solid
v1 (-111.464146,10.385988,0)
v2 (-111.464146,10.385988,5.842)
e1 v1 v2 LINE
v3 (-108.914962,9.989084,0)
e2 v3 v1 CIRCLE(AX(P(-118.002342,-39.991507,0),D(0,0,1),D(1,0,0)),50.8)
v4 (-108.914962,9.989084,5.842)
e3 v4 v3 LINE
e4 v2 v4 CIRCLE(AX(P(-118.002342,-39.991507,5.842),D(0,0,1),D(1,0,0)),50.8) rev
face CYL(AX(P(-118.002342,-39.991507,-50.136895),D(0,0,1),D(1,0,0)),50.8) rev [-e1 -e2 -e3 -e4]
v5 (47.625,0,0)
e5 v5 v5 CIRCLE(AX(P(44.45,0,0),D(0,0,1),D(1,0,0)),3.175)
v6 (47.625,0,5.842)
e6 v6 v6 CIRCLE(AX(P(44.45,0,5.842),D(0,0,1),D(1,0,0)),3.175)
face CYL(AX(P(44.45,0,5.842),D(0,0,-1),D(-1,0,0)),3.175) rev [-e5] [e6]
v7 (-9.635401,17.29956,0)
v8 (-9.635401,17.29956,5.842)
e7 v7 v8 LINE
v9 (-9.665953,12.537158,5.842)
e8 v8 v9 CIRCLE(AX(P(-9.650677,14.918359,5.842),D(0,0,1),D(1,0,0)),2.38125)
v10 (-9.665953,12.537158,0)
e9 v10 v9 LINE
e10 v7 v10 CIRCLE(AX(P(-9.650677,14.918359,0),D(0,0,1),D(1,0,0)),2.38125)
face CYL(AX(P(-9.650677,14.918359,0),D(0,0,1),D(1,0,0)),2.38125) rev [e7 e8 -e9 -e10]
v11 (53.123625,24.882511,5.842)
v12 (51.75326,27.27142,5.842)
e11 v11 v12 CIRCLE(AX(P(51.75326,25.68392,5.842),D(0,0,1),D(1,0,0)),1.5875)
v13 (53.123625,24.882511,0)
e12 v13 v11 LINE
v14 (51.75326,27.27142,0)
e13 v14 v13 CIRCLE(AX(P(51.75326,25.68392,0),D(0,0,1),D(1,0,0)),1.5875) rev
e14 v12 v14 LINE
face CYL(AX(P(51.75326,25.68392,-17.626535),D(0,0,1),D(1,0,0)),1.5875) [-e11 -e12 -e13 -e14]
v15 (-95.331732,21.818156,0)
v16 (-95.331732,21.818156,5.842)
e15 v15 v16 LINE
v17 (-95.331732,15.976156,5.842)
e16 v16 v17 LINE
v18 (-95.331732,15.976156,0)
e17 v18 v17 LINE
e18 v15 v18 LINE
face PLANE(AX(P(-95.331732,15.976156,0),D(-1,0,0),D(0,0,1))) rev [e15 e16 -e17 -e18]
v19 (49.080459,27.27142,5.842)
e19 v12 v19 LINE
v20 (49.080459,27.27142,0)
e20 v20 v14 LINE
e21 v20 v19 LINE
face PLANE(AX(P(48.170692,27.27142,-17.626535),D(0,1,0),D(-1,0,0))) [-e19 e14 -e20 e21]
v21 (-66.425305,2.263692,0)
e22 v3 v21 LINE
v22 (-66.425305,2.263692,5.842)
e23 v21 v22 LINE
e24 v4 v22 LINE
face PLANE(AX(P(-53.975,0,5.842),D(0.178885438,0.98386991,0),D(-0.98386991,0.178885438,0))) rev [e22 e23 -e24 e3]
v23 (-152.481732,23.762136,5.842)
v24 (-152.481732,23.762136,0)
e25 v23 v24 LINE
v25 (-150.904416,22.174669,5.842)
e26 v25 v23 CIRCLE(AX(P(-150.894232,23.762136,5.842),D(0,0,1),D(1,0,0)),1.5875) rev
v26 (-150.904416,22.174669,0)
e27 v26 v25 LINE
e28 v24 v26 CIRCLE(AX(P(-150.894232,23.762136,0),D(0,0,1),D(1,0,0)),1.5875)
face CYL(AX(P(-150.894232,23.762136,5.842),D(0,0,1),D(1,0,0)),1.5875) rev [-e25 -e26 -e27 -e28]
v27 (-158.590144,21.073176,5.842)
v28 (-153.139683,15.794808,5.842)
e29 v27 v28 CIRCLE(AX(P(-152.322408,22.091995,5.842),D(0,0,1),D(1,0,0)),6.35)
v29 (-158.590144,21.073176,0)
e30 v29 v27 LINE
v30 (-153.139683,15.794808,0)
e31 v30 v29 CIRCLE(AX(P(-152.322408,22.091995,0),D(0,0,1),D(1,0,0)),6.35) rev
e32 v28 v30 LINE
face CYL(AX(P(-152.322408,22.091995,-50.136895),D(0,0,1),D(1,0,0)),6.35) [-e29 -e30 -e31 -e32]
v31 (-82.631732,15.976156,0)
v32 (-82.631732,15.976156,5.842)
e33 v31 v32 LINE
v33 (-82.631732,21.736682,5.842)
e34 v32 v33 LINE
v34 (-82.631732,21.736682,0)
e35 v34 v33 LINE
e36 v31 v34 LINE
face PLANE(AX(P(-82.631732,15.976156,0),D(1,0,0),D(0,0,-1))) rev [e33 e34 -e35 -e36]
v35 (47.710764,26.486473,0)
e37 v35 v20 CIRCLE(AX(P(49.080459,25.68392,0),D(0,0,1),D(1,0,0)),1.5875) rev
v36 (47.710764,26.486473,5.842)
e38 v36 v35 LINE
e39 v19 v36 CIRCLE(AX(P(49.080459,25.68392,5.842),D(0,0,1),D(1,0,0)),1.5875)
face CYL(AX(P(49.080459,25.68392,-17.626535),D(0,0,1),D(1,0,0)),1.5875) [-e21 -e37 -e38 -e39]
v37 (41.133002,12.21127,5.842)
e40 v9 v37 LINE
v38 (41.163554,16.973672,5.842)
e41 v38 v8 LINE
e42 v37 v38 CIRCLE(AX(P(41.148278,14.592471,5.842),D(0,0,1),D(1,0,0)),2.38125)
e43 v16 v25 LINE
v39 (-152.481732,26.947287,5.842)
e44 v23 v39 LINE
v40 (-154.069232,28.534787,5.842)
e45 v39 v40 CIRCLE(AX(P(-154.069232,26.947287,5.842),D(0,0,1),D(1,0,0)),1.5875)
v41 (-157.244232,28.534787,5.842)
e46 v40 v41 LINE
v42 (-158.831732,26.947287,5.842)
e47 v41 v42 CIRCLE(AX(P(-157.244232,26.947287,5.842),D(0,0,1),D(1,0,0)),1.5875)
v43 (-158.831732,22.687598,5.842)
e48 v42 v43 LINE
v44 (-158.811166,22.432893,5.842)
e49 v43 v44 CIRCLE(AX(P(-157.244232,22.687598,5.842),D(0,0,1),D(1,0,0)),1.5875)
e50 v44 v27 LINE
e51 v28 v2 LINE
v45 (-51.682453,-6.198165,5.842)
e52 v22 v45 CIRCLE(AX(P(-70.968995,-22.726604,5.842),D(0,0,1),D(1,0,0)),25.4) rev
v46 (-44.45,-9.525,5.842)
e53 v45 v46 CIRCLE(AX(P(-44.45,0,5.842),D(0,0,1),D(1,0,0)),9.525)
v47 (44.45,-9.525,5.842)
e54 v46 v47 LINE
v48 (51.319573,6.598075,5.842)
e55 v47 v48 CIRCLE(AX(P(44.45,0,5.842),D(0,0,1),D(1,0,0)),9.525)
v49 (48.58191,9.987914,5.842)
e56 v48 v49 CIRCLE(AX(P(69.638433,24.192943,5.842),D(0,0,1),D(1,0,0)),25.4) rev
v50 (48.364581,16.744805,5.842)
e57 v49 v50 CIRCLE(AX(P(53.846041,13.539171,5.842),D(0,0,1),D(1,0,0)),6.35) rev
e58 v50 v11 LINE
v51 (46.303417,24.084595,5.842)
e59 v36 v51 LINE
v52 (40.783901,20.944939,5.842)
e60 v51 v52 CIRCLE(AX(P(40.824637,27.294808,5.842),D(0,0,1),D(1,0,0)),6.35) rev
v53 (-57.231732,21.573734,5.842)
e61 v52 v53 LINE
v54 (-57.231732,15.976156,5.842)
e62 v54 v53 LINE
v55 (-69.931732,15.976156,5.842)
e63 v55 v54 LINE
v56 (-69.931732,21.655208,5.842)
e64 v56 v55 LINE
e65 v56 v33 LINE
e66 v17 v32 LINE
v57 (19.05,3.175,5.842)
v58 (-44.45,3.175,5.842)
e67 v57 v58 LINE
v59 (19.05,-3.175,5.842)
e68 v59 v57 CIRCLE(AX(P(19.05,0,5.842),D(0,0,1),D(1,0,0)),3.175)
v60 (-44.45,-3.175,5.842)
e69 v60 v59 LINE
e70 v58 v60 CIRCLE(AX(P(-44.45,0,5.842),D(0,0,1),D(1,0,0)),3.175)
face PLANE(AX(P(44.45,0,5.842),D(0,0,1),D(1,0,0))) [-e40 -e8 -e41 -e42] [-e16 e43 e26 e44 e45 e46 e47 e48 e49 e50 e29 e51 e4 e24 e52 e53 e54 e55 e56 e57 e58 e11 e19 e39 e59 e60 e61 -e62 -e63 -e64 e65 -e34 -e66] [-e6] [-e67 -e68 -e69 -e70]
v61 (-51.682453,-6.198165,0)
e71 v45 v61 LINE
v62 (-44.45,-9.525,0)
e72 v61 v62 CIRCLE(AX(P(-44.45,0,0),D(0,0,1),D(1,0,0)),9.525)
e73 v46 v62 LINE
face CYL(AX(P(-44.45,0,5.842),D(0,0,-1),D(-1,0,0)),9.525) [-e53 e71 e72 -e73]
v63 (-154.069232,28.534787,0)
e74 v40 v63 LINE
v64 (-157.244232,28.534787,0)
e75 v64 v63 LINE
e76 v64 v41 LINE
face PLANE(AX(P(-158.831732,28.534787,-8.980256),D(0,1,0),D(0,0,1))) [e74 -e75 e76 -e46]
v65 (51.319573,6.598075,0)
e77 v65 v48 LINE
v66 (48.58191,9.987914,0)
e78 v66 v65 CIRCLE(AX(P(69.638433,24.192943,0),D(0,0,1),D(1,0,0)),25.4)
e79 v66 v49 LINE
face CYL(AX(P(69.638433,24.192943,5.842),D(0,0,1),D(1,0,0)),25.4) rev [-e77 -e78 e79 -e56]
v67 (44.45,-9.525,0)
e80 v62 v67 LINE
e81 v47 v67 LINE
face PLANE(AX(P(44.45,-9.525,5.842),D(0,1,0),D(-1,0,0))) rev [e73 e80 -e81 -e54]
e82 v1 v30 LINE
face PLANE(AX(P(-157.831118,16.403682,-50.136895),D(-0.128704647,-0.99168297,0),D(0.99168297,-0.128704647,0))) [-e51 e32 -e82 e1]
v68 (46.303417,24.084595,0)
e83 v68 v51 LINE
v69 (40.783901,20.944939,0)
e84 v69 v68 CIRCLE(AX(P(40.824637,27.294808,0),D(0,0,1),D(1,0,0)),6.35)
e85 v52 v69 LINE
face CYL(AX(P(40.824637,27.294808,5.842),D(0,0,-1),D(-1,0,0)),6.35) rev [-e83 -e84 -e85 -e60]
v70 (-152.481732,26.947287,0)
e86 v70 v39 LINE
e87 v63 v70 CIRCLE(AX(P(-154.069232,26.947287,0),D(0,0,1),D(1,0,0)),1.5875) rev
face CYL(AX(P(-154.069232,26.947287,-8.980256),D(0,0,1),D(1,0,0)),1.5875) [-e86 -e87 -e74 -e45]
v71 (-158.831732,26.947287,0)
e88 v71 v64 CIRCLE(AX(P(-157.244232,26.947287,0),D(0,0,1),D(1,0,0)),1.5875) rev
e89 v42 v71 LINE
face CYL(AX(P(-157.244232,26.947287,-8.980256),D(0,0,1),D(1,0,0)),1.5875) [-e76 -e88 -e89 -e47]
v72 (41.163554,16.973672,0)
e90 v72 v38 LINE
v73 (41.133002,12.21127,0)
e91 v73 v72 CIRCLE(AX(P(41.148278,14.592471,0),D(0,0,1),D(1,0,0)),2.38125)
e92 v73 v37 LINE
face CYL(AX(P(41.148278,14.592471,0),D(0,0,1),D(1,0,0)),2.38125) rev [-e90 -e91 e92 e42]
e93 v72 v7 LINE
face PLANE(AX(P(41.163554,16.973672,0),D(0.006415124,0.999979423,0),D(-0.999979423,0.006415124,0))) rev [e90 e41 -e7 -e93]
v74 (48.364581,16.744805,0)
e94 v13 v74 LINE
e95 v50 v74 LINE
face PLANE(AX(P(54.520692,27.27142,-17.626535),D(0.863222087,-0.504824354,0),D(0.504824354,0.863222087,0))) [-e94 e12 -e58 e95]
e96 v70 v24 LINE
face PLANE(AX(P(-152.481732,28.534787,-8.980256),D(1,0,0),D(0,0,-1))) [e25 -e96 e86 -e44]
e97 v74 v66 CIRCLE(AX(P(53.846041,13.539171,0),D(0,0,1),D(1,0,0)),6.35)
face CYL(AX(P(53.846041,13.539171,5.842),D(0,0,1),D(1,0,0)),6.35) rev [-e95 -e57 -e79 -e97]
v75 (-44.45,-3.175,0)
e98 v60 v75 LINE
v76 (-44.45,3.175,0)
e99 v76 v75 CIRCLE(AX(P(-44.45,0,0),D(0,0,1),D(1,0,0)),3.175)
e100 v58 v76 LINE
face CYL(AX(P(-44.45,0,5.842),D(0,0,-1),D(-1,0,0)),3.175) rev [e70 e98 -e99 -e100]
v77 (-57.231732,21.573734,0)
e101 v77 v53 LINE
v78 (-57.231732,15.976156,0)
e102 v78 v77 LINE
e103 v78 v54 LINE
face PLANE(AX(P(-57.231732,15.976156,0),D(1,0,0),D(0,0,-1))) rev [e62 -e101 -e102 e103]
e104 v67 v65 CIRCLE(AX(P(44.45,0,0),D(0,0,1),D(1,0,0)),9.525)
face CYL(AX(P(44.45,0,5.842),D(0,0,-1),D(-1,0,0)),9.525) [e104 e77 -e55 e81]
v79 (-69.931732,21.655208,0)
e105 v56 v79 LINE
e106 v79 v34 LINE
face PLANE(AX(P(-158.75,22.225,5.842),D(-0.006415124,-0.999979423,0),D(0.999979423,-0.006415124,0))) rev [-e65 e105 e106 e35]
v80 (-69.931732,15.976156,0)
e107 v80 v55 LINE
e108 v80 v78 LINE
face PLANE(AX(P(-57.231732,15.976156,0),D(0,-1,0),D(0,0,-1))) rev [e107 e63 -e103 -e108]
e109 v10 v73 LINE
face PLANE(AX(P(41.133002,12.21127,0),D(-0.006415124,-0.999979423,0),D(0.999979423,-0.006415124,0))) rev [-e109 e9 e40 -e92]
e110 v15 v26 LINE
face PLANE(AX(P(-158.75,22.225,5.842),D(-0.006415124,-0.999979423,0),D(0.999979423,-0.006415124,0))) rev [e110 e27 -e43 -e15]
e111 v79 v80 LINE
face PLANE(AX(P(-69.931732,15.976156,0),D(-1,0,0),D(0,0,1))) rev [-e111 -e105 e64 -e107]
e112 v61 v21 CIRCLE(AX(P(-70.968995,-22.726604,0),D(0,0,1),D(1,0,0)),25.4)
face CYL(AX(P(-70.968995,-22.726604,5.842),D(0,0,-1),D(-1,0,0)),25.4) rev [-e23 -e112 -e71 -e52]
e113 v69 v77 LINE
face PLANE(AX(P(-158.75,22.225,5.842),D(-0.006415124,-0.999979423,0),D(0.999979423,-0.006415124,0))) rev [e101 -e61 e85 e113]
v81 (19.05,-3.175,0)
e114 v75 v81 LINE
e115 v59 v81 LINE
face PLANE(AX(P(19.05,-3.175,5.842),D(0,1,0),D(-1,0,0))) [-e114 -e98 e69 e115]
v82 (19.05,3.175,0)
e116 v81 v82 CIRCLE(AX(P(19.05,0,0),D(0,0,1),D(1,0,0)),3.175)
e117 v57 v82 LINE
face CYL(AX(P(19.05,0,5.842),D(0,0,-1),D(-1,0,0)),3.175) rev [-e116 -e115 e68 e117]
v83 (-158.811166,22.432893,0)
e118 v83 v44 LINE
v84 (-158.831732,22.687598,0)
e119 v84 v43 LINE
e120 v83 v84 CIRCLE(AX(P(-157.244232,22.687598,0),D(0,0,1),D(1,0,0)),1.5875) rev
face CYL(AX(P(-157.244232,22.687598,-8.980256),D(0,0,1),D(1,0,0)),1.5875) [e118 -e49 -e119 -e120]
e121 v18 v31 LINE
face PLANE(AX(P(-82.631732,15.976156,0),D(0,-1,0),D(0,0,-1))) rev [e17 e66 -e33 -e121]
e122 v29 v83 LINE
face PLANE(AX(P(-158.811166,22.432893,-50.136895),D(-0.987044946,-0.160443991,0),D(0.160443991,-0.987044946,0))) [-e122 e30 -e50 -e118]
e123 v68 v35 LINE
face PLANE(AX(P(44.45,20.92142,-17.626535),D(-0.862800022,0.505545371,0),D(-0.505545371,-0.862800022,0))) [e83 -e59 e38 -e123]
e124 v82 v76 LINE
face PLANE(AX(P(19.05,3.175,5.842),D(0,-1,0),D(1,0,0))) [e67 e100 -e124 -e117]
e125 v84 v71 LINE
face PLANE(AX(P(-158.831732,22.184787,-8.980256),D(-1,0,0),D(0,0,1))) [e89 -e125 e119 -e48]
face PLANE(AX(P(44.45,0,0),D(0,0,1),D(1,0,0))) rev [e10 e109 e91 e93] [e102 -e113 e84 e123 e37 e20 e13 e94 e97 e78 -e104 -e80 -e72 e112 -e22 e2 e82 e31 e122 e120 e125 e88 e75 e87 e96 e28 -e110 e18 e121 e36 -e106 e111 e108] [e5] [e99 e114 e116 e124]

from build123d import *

# Parameters (mm, degrees)
SKETCH1_R           = 3.175
BOSS_EXTRUDE1_DEPTH = 5.842
FILLET1_R           = 25.4
SKETCH2_W           = 6.35
SKETCH2_H           = 6.35
BOSS_EXTRUDE2_DEPTH = 5.842
FILLET4_R           = 1.5875
FILLET5_R           = 25.4
FILLET6_R           = 6.35
SKETCH3_W           = 12.7
SKETCH3_H           = 5.842
CUT_EXTRUDE1_DEPTH  = 162.480283814
BOSS_EXTRUDE3_DEPTH = 5.842
FILLET7_R           = 6.35
FILLET8_R           = 1.5875
CUT_EXTRUDE2_DEPTH  = 162.480283814
BOSS_EXTRUDE4_DEPTH = 5.842
FILLET9_R           = 6.35
FILLET10_R          = 50.8


with BuildPart() as part:
    # Sketch1 → Boss-Extrude1 (new body)
    with BuildSketch(Plane.XY):
        with BuildLine():
            Line((44.45, -9.525), (-44.45, -9.525))
            ThreePointArc((-44.45, -9.525), (-51.185192091, -6.735192091), (-53.975, 0))
            Line((-53.975, 0), (-158.75, 19.05))
            Line((-158.75, 19.05), (-158.75, 22.225))
            Line((-158.75, 22.225), (44.45, 20.921420052))
            Line((44.45, 20.921420052), (44.45, 9.525))
            ThreePointArc((44.45, 9.525), (53.975, 0), (44.45, -9.525))
        make_face()
        with Locations((44.45, 0)):
            Circle(SKETCH1_R, mode=Mode.SUBTRACT)
        with BuildLine():
            Line((19.05, -3.175), (-44.45, -3.175))
            ThreePointArc((-44.45, -3.175), (-47.625, 0), (-44.45, 3.175))
            Line((-44.45, 3.175), (19.05, 3.175))
            ThreePointArc((19.05, 3.175), (22.225, 0), (19.05, -3.175))
        make_face(mode=Mode.SUBTRACT)
    extrude(amount=BOSS_EXTRUDE1_DEPTH)

    # Fillet1
    # the kernel refuses this fillet: 25.4 mm, written as the material it adds along each edge
    with BuildSketch(Plane(origin=(44.45, 9.525, 0), x_dir=(0, 1, 0), z_dir=(0, 0, 1))) as fillet1_piece_1:
        with BuildLine():
            CenterArc((14.667942914, -25.188432626), FILLET1_R, 97.400260925, 36.444857628)
            Line((-2.92692466, -6.869572534), (-3.278822011, -6.503195333))
            ThreePointArc((-3.278822011, -6.503195333), (-1.229577289, -3.534437867), (-0.508, 0))
            Line((-0.508, 0), (0, 0.508))
            ThreePointArc((0, 0.508), (5.698210026, 0.508), (11.330989595, 0.503768653))
            Line((11.330989595, 0.503768653), (11.396420052, 0))
        make_face()
    extrude(amount=5.842)

    # Sketch2 → Boss-Extrude2 (add)
    with BuildSketch(Plane.XY.offset(5.842)):
        with Locations((-155.65673172, 25.359787457)):
            Rectangle(SKETCH2_W, SKETCH2_H)
    extrude(amount=-BOSS_EXTRUDE2_DEPTH)

    # Fillet4
    # the kernel refuses this fillet: 1.5875 mm, written as the material it adds along each edge
    with BuildSketch(Plane(origin=(-152.48173172, 22.184787457, 5.842), x_dir=(0.9999794228826333, -0.00641512363991872, 0), z_dir=(0, 0, -1))) as fillet4_piece_1:
        with BuildLine():
            CenterArc((FILLET4_R * 0.993605321893, -FILLET4_R), FILLET4_R, 90, 89.632437969)
            Line((-FILLET4_R * 0.00637410098923, -FILLET4_R * 0.99358487636), (0, 0))
            Line((0, 0), (FILLET4_R * 0.993605321893, 0))
        make_face()
    extrude(amount=5.842)
    # the kernel refuses this fillet: 1.5875 mm, written as the material it takes off along each edge
    with BuildSketch(Plane(origin=(-158.83173172, 28.534787457, 9.81075), x_dir=(0, -1, 0), z_dir=(0, 0, -1)), Plane(origin=(-152.48173172, 28.534787457, 9.81075), x_dir=(-1, 0, 0), z_dir=(0, 0, -1))) as fillet4_2_piece_1:
        with BuildLine():
            CenterArc((FILLET4_R, -FILLET4_R), FILLET4_R, 90, 90)
            Line((0, -FILLET4_R), (0, 0))
            Line((0, 0), (FILLET4_R, 0))
        make_face()
    extrude(amount=13.7795, mode=Mode.SUBTRACT)
    with BuildSketch(Plane(origin=(-158.83173172, 22.184787457, 7.099025602), x_dir=(1.0, 1.4344436985779291e-12, 0), z_dir=(0, 0, -1))) as fillet4_2_piece_2:
        with BuildLine():
            CenterArc((1.5875, -0.502810241), FILLET4_R, 161.534664076, 18.465335924)
            Line((0, -0.502810241), (0, 0))
            Line((0, 0), (0.08173172, 0))
        make_face()
    extrude(amount=8.356051205, mode=Mode.SUBTRACT)

    # Fillet5
    fillet5_edges = [part.edges().sort_by_distance(p)[0] for p in [
        (-53.975, 0, 2.921),
    ]]
    fillet(fillet5_edges, radius=FILLET5_R)

    # Fillet6
    # the kernel refuses this fillet: 6.35 mm, written as the material it takes off along each edge
    with BuildSketch(Plane(origin=(-158.75, 19.05, -12.212686772), x_dir=(0.9838699100999072, -0.17888543819998437, 0), z_dir=(0, 0, 1))) as fillet6_piece_1:
        with BuildLine():
            CenterArc((4.885074709, 6.35), FILLET6_R, 210.950382336, 59.049617664)
            Line((-0.560767828, 3.084223053), (0, 0))
            Line((0, 0), (4.885074709, 0))
        make_face()
    extrude(amount=30.267373544, mode=Mode.SUBTRACT)

    # Sketch3 → Cut-Extrude1 (cut, through all)
    with BuildSketch(Plane.XY.offset(5.842)):
        with Locations((-88.98173172, 18.897155596)):
            Rectangle(SKETCH3_W, SKETCH3_H)
        with Locations((-63.58173172, 18.897155596)):
            Rectangle(SKETCH3_W, SKETCH3_H)
    extrude(amount=-CUT_EXTRUDE1_DEPTH, mode=Mode.SUBTRACT)

    # Sketch4 → Boss-Extrude3 (add)
    with BuildSketch(Plane.XY.offset(5.842)):
        Polygon((44.45, 20.921420052), (48.170691966, 27.271420052), (54.520691966, 27.271420052), (46.540749413, 13.626153894), (43.362669871, 15.484739273), align=None)
    extrude(amount=-BOSS_EXTRUDE3_DEPTH)

    # Fillet7
    fillet7_edges = [part.edges().sort_by_distance(p)[0] for p in [
        (44.45, 20.921420052, 2.921),
        (46.540749413, 13.626153894, 2.921),
    ]]
    fillet(fillet7_edges, radius=FILLET7_R)

    # Fillet8
    fillet8_edges = [part.edges().sort_by_distance(p)[0] for p in [
        (48.170691966, 27.271420052, 2.921),
        (54.520691966, 27.271420052, 2.921),
    ]]
    fillet(fillet8_edges, radius=FILLET8_R)

    # Sketch5 → Cut-Extrude2 (cut, through all)
    with BuildSketch(Plane.XY.offset(5.842)):
        with BuildLine():
            Line((41.13300152, 12.211269778), (-9.665953162, 12.537158059))
            ThreePointArc((-9.665953162, 12.537158059), (-12.03187815, 14.933635073), (-9.635401136, 17.29956006))
            Line((-9.635401136, 17.29956006), (41.163553547, 16.97367178))
            ThreePointArc((41.163553547, 16.97367178), (43.529478534, 14.577194766), (41.13300152, 12.211269778))
        make_face()
    extrude(amount=-CUT_EXTRUDE2_DEPTH, mode=Mode.SUBTRACT)

    # Sketch6 → Boss-Extrude4 (add)
    with BuildSketch(Plane.XY.offset(5.842)):
        Polygon((-158.811165573, 22.432892862), (-157.831118293, 16.403681612), (-110.184513465, 10.219911539), align=None)
    extrude(amount=-BOSS_EXTRUDE4_DEPTH)

    # Fillet9
    fillet9_edges = [part.edges().sort_by_distance(p)[0] for p in [
        (-157.831118293, 16.403681612, 2.921),
    ]]
    fillet(fillet9_edges, radius=FILLET9_R)

    # Fillet10
    # the kernel refuses this fillet: 50.8 mm, written as the material it adds along each edge
    with BuildSketch(Plane(origin=(-110.184513465, 10.219911539, 5.842), x_dir=(-0.9916829703779194, 0.1287046474002651, 0), z_dir=(0, 0, -1))) as fillet10_piece_1:
        with BuildLine():
            CenterArc((FILLET10_R * 0.0254008846311, -FILLET10_R), FILLET10_R, 90, 2.910101208)
            Line((-FILLET10_R * 0.0253681282132, -FILLET10_R * 0.0012895778381), (0, 0))
            Line((0, 0), (FILLET10_R * 0.0254008846311, 0))
        make_face()
    extrude(amount=5.842)


solid = part.part
